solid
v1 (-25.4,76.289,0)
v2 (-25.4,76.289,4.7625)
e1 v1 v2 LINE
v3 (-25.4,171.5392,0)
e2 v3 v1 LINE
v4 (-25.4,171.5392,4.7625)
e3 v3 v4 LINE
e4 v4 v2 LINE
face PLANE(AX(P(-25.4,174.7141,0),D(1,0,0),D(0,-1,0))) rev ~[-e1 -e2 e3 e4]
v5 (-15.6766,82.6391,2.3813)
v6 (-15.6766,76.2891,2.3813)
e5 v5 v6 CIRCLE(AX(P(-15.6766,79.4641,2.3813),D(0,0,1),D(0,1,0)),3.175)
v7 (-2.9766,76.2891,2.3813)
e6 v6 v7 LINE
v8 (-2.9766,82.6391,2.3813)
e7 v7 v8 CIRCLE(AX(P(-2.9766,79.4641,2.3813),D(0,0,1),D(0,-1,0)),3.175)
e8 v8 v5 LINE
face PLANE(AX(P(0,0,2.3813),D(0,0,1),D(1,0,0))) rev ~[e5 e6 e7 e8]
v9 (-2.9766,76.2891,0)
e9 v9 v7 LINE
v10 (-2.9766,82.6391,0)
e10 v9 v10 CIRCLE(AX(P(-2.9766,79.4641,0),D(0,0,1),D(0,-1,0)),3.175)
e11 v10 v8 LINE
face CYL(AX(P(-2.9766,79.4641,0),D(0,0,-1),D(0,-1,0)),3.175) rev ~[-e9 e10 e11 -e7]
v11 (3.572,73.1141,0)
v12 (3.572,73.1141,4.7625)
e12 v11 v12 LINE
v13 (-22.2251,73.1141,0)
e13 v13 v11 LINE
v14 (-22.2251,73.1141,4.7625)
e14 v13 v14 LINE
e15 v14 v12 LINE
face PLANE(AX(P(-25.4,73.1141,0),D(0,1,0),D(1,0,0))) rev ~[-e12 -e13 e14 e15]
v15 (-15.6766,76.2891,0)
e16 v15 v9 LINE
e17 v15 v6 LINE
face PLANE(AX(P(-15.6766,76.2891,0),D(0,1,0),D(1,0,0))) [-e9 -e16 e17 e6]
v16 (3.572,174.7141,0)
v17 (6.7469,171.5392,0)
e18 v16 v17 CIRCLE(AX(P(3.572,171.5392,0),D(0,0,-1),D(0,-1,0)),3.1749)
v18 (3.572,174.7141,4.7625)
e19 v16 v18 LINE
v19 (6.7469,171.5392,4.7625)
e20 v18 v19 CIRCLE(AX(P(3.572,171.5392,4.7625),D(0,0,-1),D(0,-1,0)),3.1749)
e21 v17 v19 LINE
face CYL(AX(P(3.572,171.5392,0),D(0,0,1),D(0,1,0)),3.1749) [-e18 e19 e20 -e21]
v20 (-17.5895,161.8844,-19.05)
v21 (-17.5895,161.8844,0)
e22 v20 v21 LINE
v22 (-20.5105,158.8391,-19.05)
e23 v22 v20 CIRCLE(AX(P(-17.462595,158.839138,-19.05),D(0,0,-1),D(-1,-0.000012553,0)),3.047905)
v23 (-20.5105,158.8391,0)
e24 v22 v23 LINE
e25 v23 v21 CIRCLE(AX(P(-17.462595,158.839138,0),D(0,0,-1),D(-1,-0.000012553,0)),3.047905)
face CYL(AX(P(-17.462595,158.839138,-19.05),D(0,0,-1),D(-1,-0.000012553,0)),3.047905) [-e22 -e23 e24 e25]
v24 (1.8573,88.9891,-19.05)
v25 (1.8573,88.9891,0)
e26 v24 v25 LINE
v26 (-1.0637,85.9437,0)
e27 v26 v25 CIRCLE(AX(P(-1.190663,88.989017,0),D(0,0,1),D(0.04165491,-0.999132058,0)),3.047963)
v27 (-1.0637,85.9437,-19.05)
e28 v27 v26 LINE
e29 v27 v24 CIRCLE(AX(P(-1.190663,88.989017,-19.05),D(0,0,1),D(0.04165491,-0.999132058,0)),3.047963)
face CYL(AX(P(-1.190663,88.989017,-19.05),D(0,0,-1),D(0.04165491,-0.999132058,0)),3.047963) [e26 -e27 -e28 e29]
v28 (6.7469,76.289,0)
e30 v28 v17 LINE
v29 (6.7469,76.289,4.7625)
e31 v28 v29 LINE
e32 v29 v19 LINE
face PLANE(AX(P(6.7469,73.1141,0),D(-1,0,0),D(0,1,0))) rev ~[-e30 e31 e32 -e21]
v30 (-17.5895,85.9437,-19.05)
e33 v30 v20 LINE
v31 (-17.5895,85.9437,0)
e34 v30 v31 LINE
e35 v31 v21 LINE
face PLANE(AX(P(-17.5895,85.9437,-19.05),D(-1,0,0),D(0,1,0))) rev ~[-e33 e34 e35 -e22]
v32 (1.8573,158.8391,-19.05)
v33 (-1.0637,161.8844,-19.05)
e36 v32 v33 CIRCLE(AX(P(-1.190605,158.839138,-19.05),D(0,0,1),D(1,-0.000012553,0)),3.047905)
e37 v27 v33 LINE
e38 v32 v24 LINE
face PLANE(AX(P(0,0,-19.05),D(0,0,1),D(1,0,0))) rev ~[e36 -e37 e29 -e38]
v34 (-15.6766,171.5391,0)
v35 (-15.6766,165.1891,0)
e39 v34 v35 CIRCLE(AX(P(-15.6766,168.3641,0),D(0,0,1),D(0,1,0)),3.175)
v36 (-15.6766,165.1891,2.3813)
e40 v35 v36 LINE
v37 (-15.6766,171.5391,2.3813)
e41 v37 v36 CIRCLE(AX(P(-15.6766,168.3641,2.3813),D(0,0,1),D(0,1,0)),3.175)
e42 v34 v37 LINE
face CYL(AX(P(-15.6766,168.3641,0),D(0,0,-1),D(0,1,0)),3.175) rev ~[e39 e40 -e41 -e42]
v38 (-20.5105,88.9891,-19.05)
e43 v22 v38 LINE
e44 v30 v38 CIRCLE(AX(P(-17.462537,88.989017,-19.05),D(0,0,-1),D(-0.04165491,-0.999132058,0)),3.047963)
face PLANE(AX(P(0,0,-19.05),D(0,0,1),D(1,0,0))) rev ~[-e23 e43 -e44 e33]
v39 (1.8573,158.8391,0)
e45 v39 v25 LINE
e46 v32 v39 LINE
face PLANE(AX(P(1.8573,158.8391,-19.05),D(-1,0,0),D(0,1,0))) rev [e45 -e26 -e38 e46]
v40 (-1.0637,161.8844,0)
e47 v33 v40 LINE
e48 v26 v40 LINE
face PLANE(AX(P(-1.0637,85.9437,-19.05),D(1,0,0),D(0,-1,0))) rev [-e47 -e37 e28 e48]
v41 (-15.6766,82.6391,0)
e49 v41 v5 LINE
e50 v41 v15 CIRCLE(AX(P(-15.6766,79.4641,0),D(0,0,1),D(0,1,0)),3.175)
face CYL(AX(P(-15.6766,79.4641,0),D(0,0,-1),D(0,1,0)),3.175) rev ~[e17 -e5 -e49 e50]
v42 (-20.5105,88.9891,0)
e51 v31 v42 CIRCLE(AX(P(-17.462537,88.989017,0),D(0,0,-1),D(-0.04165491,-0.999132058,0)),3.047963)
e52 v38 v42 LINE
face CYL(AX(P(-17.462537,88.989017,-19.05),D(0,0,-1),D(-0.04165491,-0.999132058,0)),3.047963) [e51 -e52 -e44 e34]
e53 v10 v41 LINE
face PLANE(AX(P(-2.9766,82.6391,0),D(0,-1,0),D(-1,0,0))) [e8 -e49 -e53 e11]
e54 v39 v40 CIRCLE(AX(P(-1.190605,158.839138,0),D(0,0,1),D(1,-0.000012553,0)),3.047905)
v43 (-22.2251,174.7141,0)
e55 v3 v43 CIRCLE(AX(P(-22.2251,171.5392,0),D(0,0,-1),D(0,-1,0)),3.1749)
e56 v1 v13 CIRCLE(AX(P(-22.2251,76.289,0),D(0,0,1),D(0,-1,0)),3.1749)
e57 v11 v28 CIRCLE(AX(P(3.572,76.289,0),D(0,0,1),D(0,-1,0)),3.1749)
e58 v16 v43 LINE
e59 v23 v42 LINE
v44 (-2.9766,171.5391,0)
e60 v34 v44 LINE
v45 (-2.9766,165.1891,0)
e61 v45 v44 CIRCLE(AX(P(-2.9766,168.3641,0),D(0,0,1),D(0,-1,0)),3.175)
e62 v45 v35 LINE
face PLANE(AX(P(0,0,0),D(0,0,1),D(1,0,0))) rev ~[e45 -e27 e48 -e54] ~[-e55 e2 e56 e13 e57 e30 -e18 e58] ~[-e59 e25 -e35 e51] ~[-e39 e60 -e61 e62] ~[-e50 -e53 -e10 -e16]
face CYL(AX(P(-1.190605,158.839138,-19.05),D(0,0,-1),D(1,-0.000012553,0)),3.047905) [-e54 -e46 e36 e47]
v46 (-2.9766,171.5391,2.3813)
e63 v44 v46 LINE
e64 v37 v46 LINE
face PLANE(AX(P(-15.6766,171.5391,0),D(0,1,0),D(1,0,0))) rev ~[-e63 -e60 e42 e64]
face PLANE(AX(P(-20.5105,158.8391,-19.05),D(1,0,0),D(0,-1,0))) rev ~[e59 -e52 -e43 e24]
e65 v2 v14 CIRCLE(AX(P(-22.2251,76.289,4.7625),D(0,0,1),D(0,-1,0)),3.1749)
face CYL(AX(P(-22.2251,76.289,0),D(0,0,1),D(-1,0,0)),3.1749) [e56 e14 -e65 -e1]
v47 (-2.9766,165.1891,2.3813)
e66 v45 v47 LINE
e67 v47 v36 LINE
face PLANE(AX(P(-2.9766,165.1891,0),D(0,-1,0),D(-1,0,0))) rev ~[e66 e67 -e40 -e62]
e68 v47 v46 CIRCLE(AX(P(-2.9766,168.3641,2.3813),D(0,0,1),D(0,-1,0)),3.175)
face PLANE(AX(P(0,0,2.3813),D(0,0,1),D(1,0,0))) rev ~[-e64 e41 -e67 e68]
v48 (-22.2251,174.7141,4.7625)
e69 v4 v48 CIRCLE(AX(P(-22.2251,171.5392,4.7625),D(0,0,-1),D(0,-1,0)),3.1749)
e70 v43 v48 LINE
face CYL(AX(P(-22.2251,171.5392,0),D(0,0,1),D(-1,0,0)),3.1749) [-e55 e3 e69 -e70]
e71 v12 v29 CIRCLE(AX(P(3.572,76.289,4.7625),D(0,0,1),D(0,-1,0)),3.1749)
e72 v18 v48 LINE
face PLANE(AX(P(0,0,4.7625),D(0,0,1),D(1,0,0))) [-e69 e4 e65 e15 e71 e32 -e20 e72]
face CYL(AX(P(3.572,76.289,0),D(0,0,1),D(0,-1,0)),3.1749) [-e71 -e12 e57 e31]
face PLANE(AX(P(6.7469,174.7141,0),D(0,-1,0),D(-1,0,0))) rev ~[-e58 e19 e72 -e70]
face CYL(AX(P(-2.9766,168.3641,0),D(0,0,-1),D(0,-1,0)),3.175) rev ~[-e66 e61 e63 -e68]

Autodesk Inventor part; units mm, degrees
ref_plane "YZ Plane" through (0, 0, 0) normal (1, 0, 0) x (0, 1, 0)
ref_plane "XZ Plane" through (0, 0, 0) normal (0, 1, 0) x (-1, 0, 0)
sketch "Sketch1" plane through (0, 0, 0) normal (0, 0, 1) x (1, 0, 0)
  line L0 (-18.6531, 0) -> (18.6531, 0)
  line L1 (18.6531, 0) -> (18.6531, 35.0141)
  line L2 (18.6531, 35.0141) -> (-18.6531, 35.0141)
  line L3 (-18.6531, 35.0141) -> (-18.6531, 0)
  line L4 (0, 0) -> (0, 35.0141) construction
  line L5 (-9.3266, 35.0141) -> (-9.3266, 0) construction
  line L6 (-1.8266, 0) -> (-1.8266, 145.5582) construction
  line L7 (-16.8266, 0) -> (-16.8266, 145.5582) construction
  line L8 (-16.8266, 145.5582) -> (-1.8266, 145.5582) construction
  line L9 (-25.4, 0) -> (25.4, 0) construction
  line L10 (25.4, 0) -> (25.4, 304.8) construction
  line L11 (25.4, 304.8) -> (-25.4, 304.8) construction
  line L12 (-25.4, 304.8) -> (-25.4, 0) construction
  line L13 (-25.4, 73.1141) -> (6.7469, 73.1141)
  line L14 (6.7469, 73.1141) -> (6.7469, 174.7141)
  line L15 (6.7469, 174.7141) -> (-25.4, 174.7141)
  line L16 (-25.4, 174.7141) -> (-25.4, 73.1141)
  line L17 (-20.6375, 85.8141) -> (1.9844, 85.8141)
  line L18 (1.9844, 85.8141) -> (1.9844, 162.0141)
  line L19 (1.9844, 162.0141) -> (-20.6375, 162.0141)
  line L20 (-20.6375, 162.0141) -> (-20.6375, 85.8141)
  line L21 (-17.4625, 162.0141) -> (-17.4625, 85.8141)
  line L22 (-1.1906, 85.8141) -> (-1.1906, 162.0141)
  line L23 (-15.6766, 168.3641) -> (-2.9766, 168.3641) construction
  line L24 (-15.6766, 171.5391) -> (-2.9766, 171.5391)
  line L25 (-2.9766, 165.1891) -> (-15.6766, 165.1891)
  arc A0 (-15.6766, 171.5391) -> (-15.6766, 165.1891) centre (-15.6766, 168.3641) ccw
  arc A1 (-2.9766, 165.1891) -> (-2.9766, 171.5391) centre (-2.9766, 168.3641) ccw
  line L26 (-15.6766, 79.4641) -> (-2.9766, 79.4641) construction
  line L27 (-15.6766, 76.2891) -> (-2.9766, 76.2891)
  line L28 (-2.9766, 82.6391) -> (-15.6766, 82.6391)
  arc A2 (-15.6766, 82.6391) -> (-15.6766, 76.2891) centre (-15.6766, 79.4641) ccw
  arc A3 (-2.9766, 76.2891) -> (-2.9766, 82.6391) centre (-2.9766, 79.4641) ccw
  point P0 (0, 0)
  point P1 (-9.3266, 168.3641)
  point P2 (-9.3266, 79.4641)
  dimension "d0" = 37.3062
  dimension "d1" = 35.0141
  dimension "d2" = 15
  dimension "d3" = 50.8
  dimension "d4" = 304.8
  dimension "d5" = 101.6
  dimension "d6" = 76.2
  dimension "d7" = 4.7625
  dimension "d8" = 4.7625
  dimension "d9" = 12.7
  dimension "d10" = 12.7
  dimension "d11" = 38.1
  dimension "d12" = 3.175
  dimension "d13" = 3.175
  dimension "d14" = 12.7
  dimension "d15" = 12.7
  dimension "d16" = 3.175
  dimension "d17" = 6.35
  dimension "d18" = 3.175
  dimension "d19" = 6.35
extrude "Extrusion1" add sketch "Sketch1" along normal blind 4.7625 contours L16 L15 L14 L13 | L20 L19 L21 L17 | L21 L19 L22 L17 | L22 L19 L18 L17 | L24 A1 L25 A0 | A2 L28 A3 L27
extrude "Extrusion2" cut sketch "Sketch1" along normal blind 2.3813 contours L24 A1 L25 A0 | A2 L28 A3 L27
extrude "Extrusion3" add sketch "Sketch1" against normal blind 19.05 contours L20 L19 L21 L17 | L22 L19 L18 L17
fillet "Fillet1" radius 3.175 8 edges at (-20.6375, 85.8141, -9.525) (1.9844, 85.8141, -9.525) (-20.6375, 162.0141, -9.525) (1.9844, 162.0141, -9.525) (6.7469, 73.1141, 2.3813) (-25.4, 73.1141, 2.3813) (-25.4, 174.7141, 2.3813) (6.7469, 174.7141, 2.3813)
ref_plane "Work Plane1" through (-9.3266, 85.8141, 0) normal (-1, 0, 0) x (0, 0, 1)
sketch "Sketch2" plane through (0, 0, -19.05) normal (0, 0, -1) x (-1, 0, 0)
  arc A0 (20.6375, 158.8391) -> (17.4625, 162.0141) centre (17.4625, 158.8391) ccw projected
  line L0 (17.4625, 162.0141) -> (17.4625, 85.8141) projected
  arc A1 (17.4625, 85.8141) -> (20.6375, 88.9891) centre (17.4625, 88.9891) ccw projected
  line L1 (20.6375, 88.9891) -> (20.6375, 158.8391) projected
  arc A2 (20.5105, 158.8391) -> (17.5895, 161.8844) centre (17.4625, 158.8391) ccw
  line L2 (20.5105, 158.8391) -> (20.5105, 88.9891)
  arc A3 (17.5895, 85.9437) -> (20.5105, 88.9891) centre (17.4625, 88.9891) ccw
  line L3 (17.5895, 85.9437) -> (17.5895, 161.8844)
  point P0 (0, 0)
  dimension "d27" = 0.127
extrude "Extrusion4" cut sketch "Sketch2" against normal up to surface (19.05 mm away)
mirror "Mirror1" about plane through (-9.3266, 85.8141, 0) normal (-1, 0, 0) of "Extrusion4"
equation "\"d9\" = d10"
properties part number "Maglock Aligner" material "Polyethylene, High Density"
